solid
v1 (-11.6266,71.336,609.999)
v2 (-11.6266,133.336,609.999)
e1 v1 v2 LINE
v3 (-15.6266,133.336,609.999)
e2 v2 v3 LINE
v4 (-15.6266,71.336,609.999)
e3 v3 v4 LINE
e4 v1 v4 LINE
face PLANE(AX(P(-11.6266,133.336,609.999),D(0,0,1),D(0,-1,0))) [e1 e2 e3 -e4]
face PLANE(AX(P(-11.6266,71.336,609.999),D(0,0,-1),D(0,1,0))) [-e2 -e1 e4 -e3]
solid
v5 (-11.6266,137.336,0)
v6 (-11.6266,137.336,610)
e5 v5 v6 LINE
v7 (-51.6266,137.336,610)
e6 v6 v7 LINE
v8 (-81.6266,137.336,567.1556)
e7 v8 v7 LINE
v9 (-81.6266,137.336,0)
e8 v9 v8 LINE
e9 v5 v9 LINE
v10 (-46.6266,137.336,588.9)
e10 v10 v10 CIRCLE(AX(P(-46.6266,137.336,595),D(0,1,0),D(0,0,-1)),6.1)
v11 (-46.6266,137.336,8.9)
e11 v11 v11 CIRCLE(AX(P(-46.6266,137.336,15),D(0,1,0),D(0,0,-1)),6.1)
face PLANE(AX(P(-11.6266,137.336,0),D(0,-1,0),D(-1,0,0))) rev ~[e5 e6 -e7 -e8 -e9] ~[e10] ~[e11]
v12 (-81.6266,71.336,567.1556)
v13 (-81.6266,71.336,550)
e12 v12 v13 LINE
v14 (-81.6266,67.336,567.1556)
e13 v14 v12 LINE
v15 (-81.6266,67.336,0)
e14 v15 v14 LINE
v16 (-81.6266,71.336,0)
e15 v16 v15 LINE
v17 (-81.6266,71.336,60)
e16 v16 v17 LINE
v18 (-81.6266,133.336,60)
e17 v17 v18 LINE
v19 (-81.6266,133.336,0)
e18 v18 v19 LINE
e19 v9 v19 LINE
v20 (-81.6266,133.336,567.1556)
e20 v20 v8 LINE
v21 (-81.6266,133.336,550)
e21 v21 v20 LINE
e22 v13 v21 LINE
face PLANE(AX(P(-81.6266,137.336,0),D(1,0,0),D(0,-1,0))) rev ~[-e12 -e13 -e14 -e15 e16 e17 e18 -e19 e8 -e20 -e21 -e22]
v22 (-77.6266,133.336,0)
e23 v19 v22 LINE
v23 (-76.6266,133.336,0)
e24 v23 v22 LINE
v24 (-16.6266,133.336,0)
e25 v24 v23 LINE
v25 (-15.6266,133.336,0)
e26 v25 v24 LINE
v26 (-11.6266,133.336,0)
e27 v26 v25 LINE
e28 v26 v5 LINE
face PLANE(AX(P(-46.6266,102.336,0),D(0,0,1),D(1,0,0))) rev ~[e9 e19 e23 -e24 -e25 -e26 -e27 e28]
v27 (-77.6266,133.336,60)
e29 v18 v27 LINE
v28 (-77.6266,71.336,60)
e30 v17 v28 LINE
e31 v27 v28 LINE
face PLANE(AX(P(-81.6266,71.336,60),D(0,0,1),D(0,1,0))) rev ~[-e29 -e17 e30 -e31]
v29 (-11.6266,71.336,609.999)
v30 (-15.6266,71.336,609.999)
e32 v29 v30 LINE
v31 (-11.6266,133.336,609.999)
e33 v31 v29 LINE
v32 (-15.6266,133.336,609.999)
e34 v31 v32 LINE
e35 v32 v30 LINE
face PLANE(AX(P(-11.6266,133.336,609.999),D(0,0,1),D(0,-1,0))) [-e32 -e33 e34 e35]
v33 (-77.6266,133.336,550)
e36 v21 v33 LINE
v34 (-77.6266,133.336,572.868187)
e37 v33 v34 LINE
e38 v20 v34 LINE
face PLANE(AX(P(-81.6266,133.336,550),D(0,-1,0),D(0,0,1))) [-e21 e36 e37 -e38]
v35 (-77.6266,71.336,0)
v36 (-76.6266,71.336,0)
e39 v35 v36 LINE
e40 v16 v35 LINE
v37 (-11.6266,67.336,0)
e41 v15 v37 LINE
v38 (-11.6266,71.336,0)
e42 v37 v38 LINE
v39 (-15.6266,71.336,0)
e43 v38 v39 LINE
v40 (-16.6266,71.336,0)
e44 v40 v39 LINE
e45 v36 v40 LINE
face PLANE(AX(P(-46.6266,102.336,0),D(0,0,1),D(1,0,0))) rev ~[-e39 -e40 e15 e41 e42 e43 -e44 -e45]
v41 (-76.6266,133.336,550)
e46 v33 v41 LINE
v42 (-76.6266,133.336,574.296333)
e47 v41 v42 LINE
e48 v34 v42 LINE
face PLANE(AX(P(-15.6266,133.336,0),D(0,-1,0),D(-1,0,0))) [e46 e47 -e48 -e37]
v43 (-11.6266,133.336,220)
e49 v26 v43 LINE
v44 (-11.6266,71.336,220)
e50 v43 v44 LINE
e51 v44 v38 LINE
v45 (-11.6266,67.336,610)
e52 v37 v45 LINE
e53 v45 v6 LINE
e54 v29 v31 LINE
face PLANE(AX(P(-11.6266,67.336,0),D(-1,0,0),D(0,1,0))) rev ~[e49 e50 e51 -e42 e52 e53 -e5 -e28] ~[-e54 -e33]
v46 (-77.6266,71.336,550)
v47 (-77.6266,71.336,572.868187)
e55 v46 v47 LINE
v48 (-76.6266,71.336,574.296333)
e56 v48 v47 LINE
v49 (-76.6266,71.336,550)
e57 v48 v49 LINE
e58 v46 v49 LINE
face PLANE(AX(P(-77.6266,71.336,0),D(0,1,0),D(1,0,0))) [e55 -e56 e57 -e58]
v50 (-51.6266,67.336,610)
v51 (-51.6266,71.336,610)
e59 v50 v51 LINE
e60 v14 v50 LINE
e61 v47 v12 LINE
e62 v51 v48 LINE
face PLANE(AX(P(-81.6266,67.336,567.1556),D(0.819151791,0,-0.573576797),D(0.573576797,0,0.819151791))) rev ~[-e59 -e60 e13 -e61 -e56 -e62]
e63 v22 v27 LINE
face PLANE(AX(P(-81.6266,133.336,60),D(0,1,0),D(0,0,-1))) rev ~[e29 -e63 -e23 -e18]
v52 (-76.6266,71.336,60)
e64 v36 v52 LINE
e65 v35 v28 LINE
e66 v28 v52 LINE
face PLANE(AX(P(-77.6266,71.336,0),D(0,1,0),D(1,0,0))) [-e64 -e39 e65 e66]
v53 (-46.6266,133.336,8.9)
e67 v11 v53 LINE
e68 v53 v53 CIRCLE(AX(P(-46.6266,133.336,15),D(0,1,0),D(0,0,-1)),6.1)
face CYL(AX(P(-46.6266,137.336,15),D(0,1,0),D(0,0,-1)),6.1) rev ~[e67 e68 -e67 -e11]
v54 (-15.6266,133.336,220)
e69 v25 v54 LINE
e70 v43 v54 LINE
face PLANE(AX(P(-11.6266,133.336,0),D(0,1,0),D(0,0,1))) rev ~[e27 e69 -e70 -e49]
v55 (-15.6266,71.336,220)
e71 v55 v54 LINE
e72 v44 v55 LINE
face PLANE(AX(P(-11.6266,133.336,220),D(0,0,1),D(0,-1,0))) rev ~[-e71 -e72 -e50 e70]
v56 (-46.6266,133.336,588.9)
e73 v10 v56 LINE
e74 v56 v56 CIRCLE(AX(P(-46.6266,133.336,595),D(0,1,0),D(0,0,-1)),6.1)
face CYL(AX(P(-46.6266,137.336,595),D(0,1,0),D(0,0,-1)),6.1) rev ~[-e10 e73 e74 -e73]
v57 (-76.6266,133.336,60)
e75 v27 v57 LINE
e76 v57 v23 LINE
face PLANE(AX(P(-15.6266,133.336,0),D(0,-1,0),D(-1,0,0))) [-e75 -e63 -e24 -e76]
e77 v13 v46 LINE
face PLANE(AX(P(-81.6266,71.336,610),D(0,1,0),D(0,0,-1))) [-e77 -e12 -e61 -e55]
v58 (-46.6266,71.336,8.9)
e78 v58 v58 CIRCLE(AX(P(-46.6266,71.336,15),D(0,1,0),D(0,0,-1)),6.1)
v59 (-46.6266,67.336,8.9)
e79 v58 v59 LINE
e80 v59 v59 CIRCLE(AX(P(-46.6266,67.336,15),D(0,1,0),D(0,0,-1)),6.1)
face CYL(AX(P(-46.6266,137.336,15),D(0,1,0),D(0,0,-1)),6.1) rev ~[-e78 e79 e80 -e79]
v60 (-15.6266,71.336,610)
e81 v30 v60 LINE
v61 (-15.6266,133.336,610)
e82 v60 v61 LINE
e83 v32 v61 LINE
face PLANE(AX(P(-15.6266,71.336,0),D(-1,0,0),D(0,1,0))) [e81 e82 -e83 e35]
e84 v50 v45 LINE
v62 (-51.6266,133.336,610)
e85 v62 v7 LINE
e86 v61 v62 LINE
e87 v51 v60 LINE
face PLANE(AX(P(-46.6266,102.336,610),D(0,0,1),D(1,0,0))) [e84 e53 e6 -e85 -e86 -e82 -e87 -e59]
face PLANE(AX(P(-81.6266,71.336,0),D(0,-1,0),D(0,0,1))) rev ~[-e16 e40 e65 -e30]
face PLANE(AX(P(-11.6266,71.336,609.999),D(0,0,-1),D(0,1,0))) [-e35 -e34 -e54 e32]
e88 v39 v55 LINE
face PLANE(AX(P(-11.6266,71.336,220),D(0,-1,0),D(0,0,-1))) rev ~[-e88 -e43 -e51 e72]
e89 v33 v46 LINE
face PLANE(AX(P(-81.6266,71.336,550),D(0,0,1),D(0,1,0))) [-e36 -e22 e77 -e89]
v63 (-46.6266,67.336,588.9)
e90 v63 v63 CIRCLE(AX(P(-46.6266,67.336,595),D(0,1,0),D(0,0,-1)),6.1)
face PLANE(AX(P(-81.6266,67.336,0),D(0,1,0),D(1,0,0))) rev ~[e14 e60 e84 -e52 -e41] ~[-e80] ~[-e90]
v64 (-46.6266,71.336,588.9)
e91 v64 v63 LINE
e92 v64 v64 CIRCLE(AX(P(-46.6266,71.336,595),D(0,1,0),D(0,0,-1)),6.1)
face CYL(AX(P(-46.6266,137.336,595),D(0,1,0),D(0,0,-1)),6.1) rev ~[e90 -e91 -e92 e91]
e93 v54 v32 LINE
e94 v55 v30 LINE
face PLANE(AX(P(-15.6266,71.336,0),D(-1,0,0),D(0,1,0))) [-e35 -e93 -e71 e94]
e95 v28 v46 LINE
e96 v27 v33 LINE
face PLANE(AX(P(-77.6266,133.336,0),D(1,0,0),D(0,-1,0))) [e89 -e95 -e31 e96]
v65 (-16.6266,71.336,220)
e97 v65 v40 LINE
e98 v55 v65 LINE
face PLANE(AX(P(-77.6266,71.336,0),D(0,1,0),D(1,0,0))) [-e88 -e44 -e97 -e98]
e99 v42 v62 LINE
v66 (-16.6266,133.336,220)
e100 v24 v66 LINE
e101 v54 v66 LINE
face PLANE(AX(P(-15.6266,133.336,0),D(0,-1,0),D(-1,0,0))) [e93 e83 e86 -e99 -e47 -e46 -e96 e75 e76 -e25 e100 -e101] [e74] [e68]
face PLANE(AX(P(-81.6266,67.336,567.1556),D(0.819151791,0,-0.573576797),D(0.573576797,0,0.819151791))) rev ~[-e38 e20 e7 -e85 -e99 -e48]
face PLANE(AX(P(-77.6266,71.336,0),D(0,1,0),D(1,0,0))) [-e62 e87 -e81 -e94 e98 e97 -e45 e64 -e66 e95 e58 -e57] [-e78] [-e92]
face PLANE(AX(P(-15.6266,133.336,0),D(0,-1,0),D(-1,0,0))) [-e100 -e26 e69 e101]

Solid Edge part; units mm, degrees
sketch "Sketch1" plane through (0, 0, 0) normal (0, 0, 1) x (1, 0, 0)
  line L0 (-81.6266, 67.336) -> (-11.6266, 67.336)
  line L1 (-11.6266, 67.336) -> (-11.6266, 137.336)
  line L2 (-11.6266, 137.336) -> (-81.6266, 137.336)
  line L3 (-81.6266, 137.336) -> (-81.6266, 67.336)
  line L4 (-77.6266, 71.336) -> (-15.6266, 71.336)
  line L5 (-15.6266, 71.336) -> (-15.6266, 133.336)
  line L6 (-15.6266, 133.336) -> (-77.6266, 133.336)
  line L7 (-77.6266, 133.336) -> (-77.6266, 71.336)
  dimension "D1" = 70
  dimension "D2" = 70
  dimension "D3" = 4
  dimension "D4" = 4
extrude "Protrusion1" add sketch "Sketch1" along normal blind 610
sketch "Sketch2" plane through (-56.6266, 137.336, 367.5) normal (0, 1, 0) x (0, 0, -1)
  circle A0 centre (352.5, -10) radius 6.1
  circle A1 centre (-227.5, -10) radius 6.1
  dimension "D1" = 15
  dimension "D2" = 15
  dimension "D3" = 12.2
  dimension "D4" = 12.2
extrude "Cutout1" cut sketch "Sketch2" against normal through all
sketch "Sketch3" plane through (-11.6266, 92.336, 367.5) normal (1, 0, 0) x (0, 0, -1)
  line L0 (147.5, -21) -> (367.5, -21)
  line L1 (367.5, -21) -> (367.5, 41)
  line L2 (367.5, 41) -> (147.5, 41)
  line L3 (147.5, 41) -> (147.5, -21)
  line L4 (-242.5, 41) -> (-242.499, 41) construction
  line L5 (-242.499, 41) -> (-242.499, -21)
  line L6 (-242.499, -21) -> (-242.5, -21) construction
  line L7 (-242.5, -21) -> (-242.5, 41)
  dimension "D1" = 0.001
  dimension "D2" = 62
  dimension "D3" = 62
  dimension "D4" = 220
extrude "Cutout2" cut sketch "Sketch3" against normal blind 5
sketch "Sketch4" plane through (-81.6266, 92.336, 367.5) normal (-1, 0, 0) x (0, 0, -1)
  line L0 (307.5, -41) -> (367.5, -41)
  line L1 (367.5, -41) -> (367.5, 21)
  line L2 (367.5, 21) -> (307.5, 21)
  line L3 (307.5, 21) -> (307.5, -41)
  line L4 (-242.5, 21) -> (-182.5, 21)
  line L5 (-182.5, 21) -> (-182.5, -41)
  line L6 (-182.5, -41) -> (-242.5, -41)
  line L7 (-242.5, -41) -> (-242.5, 21)
  dimension "D1" = 60
  dimension "D2" = 62
  dimension "D3" = 60
  dimension "D4" = 62
extrude "ExtrudedCutout_3" cut sketch "Sketch4" against normal blind 5
sketch "Sketch5" plane through (-46.6266, 67.336, 367.5) normal (0, -1, 0) x (0, 0, 1)
  line L0 (242.5, 35) -> (199.6556, 35)
  line L1 (199.6556, 35) -> (242.5, 5)
  line L2 (242.5, 5) -> (242.5, 35)
  dimension "D1" = 30
extrude "Cutout3" cut sketch "Sketch5" against normal through all
properties material "Aluminum, 6061-T6"
